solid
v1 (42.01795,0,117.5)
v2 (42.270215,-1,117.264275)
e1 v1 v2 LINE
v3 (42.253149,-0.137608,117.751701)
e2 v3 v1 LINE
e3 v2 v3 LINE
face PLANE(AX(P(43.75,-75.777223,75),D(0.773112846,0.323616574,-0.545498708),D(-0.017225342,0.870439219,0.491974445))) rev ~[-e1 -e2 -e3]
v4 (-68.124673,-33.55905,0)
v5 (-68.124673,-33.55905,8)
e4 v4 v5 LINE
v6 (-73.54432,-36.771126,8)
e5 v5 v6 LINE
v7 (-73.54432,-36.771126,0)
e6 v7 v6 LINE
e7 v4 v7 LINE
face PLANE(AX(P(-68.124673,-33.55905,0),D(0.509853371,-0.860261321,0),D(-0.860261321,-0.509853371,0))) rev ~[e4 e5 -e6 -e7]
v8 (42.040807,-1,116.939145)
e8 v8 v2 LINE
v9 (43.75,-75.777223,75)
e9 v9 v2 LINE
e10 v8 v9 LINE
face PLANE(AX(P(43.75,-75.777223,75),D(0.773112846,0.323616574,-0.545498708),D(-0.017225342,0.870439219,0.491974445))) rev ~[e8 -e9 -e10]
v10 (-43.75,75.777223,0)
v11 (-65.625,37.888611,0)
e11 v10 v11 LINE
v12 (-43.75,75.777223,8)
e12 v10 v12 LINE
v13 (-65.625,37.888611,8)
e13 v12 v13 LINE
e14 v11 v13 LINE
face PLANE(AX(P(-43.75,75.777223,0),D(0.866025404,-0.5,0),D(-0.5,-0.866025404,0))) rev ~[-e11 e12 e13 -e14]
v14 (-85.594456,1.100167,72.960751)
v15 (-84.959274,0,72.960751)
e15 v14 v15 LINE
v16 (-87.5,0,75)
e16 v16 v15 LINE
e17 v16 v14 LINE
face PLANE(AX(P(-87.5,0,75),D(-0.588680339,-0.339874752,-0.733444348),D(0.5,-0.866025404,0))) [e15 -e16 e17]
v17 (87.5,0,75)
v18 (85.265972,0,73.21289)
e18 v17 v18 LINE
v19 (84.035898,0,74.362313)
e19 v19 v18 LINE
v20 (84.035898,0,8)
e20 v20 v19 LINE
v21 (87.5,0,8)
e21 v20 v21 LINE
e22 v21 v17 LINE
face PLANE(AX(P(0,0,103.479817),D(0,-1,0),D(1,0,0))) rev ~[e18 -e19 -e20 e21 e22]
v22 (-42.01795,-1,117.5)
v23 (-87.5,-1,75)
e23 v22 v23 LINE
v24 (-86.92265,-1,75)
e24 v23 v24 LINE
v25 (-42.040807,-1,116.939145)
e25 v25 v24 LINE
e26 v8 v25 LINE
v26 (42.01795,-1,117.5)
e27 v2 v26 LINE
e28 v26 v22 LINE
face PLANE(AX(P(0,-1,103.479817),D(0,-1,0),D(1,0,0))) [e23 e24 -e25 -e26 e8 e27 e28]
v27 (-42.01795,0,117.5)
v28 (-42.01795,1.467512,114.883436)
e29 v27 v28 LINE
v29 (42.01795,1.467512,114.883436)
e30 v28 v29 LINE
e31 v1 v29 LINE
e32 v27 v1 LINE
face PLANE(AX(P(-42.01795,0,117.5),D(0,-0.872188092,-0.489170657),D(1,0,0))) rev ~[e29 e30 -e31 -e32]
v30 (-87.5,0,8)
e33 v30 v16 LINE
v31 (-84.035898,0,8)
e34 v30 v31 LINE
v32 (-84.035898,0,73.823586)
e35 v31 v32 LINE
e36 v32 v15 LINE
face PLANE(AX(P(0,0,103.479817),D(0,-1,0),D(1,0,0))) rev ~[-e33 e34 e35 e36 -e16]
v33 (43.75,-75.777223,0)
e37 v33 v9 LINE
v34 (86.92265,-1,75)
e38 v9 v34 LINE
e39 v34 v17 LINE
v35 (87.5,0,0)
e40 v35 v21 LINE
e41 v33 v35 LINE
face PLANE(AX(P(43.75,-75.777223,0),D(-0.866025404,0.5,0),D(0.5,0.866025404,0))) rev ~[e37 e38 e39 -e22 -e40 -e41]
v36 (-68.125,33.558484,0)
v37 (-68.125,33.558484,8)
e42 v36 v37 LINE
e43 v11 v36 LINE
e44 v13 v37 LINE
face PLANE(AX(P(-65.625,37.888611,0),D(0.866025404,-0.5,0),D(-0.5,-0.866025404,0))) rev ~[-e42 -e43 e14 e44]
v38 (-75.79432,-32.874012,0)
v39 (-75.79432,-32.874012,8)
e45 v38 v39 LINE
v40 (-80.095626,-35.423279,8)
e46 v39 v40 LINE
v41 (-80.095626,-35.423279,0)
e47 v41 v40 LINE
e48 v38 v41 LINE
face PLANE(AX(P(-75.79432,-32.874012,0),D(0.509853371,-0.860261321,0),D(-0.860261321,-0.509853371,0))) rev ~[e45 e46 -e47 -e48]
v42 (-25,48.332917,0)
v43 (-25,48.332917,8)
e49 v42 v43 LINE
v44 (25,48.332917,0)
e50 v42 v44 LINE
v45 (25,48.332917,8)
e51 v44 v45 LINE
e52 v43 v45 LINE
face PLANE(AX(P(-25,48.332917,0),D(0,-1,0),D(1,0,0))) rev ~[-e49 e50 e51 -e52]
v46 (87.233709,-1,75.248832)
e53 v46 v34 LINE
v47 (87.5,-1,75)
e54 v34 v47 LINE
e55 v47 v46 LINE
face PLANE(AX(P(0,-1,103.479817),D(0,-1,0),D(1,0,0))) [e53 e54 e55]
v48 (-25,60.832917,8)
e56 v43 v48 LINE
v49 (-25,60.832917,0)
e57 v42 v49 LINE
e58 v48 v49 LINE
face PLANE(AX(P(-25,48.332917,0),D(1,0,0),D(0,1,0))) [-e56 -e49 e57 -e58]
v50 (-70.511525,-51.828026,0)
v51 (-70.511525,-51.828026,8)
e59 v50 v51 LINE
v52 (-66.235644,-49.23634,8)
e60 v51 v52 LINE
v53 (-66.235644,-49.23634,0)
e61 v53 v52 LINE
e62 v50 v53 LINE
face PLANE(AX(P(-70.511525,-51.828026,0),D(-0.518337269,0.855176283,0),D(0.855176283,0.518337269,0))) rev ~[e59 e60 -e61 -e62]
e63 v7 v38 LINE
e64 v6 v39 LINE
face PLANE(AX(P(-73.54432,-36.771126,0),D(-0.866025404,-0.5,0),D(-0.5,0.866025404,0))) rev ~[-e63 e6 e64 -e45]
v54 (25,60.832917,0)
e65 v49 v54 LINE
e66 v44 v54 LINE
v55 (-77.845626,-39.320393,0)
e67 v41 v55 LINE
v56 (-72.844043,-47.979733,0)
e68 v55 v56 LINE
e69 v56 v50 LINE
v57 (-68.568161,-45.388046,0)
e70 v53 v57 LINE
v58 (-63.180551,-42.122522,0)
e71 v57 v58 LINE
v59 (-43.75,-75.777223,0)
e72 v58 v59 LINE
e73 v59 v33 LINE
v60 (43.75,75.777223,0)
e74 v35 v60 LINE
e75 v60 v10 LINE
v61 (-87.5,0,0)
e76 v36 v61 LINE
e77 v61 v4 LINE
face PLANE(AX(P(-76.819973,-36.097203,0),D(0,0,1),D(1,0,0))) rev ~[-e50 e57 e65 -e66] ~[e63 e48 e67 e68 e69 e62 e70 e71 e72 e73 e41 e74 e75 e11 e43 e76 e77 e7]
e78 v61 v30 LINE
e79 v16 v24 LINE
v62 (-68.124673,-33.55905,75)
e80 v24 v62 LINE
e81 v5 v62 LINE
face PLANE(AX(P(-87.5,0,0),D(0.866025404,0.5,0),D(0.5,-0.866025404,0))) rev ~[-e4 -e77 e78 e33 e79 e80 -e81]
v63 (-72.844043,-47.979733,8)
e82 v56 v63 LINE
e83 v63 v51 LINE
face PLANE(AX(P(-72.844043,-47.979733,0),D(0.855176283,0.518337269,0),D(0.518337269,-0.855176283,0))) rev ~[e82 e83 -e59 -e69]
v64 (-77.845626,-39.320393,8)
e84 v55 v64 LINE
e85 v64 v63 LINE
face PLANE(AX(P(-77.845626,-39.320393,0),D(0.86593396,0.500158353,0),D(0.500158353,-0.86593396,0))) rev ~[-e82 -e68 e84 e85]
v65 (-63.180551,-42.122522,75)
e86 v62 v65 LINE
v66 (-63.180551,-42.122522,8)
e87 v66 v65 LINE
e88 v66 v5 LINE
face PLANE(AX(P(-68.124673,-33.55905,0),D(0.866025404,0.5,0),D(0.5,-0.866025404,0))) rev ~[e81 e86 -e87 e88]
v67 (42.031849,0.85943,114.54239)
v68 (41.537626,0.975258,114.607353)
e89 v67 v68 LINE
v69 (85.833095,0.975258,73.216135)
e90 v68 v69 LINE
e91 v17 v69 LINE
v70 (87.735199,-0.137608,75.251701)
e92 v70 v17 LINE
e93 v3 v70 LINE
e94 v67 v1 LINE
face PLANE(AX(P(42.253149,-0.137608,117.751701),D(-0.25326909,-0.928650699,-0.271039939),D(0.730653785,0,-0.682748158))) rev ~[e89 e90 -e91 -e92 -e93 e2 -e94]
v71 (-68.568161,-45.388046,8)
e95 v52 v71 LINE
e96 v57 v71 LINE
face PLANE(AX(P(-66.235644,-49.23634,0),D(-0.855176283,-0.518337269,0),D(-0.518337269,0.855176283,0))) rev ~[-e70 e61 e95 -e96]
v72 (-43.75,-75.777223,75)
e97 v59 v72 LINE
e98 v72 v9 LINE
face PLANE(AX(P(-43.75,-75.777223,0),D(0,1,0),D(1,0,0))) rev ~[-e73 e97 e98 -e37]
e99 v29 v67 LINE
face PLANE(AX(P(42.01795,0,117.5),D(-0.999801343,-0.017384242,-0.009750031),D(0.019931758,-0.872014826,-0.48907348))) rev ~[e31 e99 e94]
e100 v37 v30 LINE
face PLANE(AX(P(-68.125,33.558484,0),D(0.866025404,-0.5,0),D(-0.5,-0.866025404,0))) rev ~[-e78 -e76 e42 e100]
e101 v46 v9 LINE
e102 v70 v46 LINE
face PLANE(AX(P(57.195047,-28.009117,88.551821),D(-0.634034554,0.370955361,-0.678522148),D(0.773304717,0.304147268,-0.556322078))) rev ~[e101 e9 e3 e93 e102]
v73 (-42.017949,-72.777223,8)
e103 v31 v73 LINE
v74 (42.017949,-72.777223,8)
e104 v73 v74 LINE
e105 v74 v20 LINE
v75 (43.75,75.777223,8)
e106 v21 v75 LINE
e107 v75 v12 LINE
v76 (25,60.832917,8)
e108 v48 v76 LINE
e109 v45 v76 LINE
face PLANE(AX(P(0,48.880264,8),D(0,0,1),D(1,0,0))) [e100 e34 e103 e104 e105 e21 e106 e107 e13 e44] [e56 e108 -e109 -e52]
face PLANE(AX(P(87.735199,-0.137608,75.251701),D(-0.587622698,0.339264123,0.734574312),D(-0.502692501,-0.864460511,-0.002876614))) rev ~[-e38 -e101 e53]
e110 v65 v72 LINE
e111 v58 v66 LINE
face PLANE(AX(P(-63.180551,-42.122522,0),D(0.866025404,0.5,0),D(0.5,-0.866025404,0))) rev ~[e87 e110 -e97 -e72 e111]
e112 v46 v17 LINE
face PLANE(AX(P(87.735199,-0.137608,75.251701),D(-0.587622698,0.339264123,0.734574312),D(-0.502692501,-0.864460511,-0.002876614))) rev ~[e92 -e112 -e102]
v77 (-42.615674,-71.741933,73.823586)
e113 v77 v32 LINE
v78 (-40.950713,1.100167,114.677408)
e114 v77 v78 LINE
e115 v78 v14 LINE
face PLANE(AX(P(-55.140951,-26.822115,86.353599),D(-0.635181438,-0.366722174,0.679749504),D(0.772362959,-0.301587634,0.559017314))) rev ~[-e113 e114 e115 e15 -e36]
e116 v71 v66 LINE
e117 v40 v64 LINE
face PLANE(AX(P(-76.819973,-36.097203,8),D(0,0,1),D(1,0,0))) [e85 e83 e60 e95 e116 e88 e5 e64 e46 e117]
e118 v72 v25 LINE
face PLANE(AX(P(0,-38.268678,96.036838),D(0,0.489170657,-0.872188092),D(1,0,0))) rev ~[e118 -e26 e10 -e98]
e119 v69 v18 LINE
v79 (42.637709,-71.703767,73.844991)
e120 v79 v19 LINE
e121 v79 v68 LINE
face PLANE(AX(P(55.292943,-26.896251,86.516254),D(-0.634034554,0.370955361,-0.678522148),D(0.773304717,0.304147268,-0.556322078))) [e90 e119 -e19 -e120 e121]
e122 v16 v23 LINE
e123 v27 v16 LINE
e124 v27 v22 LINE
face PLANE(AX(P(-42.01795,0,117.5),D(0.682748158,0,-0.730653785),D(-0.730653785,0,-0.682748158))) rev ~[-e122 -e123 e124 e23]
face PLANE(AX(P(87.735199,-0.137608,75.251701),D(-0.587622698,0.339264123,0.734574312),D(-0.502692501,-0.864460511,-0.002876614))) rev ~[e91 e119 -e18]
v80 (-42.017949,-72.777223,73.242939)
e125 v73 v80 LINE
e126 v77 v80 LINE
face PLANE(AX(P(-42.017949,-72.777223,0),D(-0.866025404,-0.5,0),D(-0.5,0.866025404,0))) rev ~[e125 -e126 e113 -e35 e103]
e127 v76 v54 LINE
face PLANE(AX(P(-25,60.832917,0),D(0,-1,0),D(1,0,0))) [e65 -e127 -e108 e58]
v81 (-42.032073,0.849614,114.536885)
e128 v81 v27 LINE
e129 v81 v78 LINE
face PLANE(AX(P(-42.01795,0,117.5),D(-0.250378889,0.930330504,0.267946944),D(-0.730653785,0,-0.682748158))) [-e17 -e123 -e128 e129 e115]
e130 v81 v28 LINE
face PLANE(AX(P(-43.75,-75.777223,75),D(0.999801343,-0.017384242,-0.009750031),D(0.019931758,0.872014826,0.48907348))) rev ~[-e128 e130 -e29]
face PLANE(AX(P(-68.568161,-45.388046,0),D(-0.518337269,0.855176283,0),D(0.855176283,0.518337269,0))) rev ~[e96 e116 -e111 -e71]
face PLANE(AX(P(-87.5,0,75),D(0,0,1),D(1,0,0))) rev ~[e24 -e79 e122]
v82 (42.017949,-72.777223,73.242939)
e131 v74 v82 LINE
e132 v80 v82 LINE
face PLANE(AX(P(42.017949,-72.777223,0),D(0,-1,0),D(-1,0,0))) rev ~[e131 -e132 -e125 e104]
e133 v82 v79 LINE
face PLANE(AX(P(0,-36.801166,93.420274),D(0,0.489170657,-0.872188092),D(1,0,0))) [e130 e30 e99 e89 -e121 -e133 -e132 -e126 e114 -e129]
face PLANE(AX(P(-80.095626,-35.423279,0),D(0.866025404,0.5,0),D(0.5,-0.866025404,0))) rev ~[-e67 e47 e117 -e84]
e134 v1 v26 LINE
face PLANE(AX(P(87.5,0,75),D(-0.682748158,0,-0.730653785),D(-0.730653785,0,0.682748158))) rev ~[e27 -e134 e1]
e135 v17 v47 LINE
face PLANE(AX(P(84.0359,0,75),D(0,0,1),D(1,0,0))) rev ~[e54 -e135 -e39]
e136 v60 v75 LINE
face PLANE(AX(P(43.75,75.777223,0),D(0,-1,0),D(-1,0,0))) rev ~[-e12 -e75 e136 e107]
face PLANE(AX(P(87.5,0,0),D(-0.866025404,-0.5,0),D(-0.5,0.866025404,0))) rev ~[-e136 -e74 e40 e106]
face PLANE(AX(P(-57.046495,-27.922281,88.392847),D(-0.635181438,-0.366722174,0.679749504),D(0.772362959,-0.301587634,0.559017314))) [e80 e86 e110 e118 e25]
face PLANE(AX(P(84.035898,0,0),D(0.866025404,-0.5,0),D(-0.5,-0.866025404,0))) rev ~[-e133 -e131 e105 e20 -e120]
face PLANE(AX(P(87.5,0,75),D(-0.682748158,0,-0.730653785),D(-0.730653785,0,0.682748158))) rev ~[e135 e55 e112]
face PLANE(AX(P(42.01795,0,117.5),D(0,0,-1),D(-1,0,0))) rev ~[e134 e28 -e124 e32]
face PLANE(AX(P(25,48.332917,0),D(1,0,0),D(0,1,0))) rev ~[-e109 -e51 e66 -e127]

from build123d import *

# Parameters (mm, degrees)
F0_W      = 50
F0_H      = 12.5
F1_DEPTH  = 8
F2_DEPTH  = 75
F4_DEPTH  = 8
F7_DEPTH  = 3
F8_DEPTH  = 1
F11_DEPTH = 3
F14_DEPTH = 3
F15_DEPTH = 8
F16_DEPTH = 8
F17_DEPTH = 12.5


# Not quite as in the source:
# - a feature names something its author has since deleted; it is built from what else it names


with BuildPart() as f1:
    # F0 (on Top) → F1 (new body)
    with BuildSketch(Plane.XY):
        Polygon((42.0179491924, -72.7772228311), (84.0358983849, 0), (42.0179491924, 72.7772228311), (-42.0179491924, 72.7772228311), (-84.0358983849, 0), (-42.0179491924, -72.7772228311), align=None)
        with Locations((0, 54.5829171234)):
            Rectangle(F0_W, F0_H, mode=Mode.SUBTRACT)
    extrude(amount=F1_DEPTH)

    # F0 (on Top) → F2 (join)
    with BuildSketch(Plane.XY):
        Polygon((43.75, -75.7772228311), (87.5, 0), (84.0358983849, 0), (42.0179491924, -72.7772228311), (-42.0179491924, -72.7772228311), (-84.0358983849, 0), (-87.5, 0), (-68.1246734519, -33.5590499945), (-63.1805508476, -42.1225215441), (-43.75, -75.7772228311), align=None)
    extrude(amount=F2_DEPTH)

    # F0 (on Top) → F4 (join)
    with BuildSketch(Plane.XY):
        Polygon((43.75, 75.7772228311), (-43.75, 75.7772228311), (-65.625, 37.8886114156), (-68.125, 33.5584843966), (-87.5, 0), (-84.0358983849, 0), (-42.0179491924, 72.7772228311), (42.0179491924, 72.7772228311), (84.0358983849, 0), (87.5, 0), align=None)
    extrude(amount=F4_DEPTH)

    # F6 (on face) → F7 (join)
    with BuildSketch(Plane(origin=(0, -50.1312366318, 89.3836679776), x_dir=(1, 0, 0), z_dir=(0, 0.4891706574, -0.872188092))):
        Polygon((43.75, 29.4041920927), (0, 29.4041920927), (-43.75, 29.4041920927), (-42.01795, -57.4775522498), (42.01795, -57.4775522498), align=None)
    extrude(amount=F7_DEPTH)

    # F3 (on Front) → F8 (join)
    with BuildSketch(Plane.XZ):
        Polygon((-42.01795, 114.5), (0, 114.5), (42.01795, 114.5), (84.0359, 75), (87.5, 75), (42.01795, 117.5), (0, 117.5), (-42.01795, 117.5), (-87.5, 75), (-84.0359, 75), align=None)
    extrude(amount=F8_DEPTH)

    # F10 (on face) → F11 (join)
    with BuildSketch(Plane(origin=(-67.6846727043, -39.0777640058, 72.4338274863), x_dir=(0.7723629594, -0.3015876344, 0.5590173143), z_dir=(-0.6351814378, -0.3667221741, 0.6797495039))):
        Polygon((33.2314262259, 55.789645187), (-25.6554603702, 35.6104118215), (30.9888924807, -31.0804218073), align=None)
    extrude(amount=-F11_DEPTH)

    # F13 (on face) → F14 (join)
    with BuildSketch(Plane(origin=(67.6756688636, -39.5950852503, 72.4241918832), x_dir=(0.7733047167, 0.3041472681, -0.556322078), z_dir=(-0.6340345536, 0.3709553614, -0.6785221475))):
        Polygon((-30.939509805, 30.5117392321), (-32.8751652468, -56.3649154418), (25.9400068576, -35.9776056011), align=None)
    extrude(amount=F14_DEPTH)

    # F0 (on Top) → F15 (join)
    with BuildSketch(Plane.XY):
        with Locations((0, 54.5829171234)):
            Rectangle(F0_W, F0_H)
    extrude(amount=F15_DEPTH)

    # F0 (on Top) → F16 (join)
    with BuildSketch(Plane.XY):
        Polygon((-77.8456263738, -39.3203930924), (-73.5443197712, -36.7711262349), (-75.7943197712, -32.8740119179), (-80.0956263738, -35.4232787754), align=None)
        Polygon((-63.1805508476, -42.1225215441), (-68.1246734519, -33.5590499945), (-73.5443197712, -36.7711262349), (-77.8456263738, -39.3203930924), (-72.8440428469, -47.9797326875), (-68.5681614313, -45.3880463409), align=None)
        Polygon((-66.2356437193, -49.236339615), (-68.5681614313, -45.3880463409), (-72.8440428469, -47.9797326875), (-70.5115251349, -51.8280259616), align=None)
    extrude(amount=F16_DEPTH)

    # F0 (on Top) → F17 (cut, symmetric)
    with BuildSketch(Plane.XY):
        with Locations((0, 54.5829171234)):
            Rectangle(F0_W, F0_H)
    extrude(amount=F17_DEPTH, both=True, mode=Mode.SUBTRACT)


solid = f1.part
